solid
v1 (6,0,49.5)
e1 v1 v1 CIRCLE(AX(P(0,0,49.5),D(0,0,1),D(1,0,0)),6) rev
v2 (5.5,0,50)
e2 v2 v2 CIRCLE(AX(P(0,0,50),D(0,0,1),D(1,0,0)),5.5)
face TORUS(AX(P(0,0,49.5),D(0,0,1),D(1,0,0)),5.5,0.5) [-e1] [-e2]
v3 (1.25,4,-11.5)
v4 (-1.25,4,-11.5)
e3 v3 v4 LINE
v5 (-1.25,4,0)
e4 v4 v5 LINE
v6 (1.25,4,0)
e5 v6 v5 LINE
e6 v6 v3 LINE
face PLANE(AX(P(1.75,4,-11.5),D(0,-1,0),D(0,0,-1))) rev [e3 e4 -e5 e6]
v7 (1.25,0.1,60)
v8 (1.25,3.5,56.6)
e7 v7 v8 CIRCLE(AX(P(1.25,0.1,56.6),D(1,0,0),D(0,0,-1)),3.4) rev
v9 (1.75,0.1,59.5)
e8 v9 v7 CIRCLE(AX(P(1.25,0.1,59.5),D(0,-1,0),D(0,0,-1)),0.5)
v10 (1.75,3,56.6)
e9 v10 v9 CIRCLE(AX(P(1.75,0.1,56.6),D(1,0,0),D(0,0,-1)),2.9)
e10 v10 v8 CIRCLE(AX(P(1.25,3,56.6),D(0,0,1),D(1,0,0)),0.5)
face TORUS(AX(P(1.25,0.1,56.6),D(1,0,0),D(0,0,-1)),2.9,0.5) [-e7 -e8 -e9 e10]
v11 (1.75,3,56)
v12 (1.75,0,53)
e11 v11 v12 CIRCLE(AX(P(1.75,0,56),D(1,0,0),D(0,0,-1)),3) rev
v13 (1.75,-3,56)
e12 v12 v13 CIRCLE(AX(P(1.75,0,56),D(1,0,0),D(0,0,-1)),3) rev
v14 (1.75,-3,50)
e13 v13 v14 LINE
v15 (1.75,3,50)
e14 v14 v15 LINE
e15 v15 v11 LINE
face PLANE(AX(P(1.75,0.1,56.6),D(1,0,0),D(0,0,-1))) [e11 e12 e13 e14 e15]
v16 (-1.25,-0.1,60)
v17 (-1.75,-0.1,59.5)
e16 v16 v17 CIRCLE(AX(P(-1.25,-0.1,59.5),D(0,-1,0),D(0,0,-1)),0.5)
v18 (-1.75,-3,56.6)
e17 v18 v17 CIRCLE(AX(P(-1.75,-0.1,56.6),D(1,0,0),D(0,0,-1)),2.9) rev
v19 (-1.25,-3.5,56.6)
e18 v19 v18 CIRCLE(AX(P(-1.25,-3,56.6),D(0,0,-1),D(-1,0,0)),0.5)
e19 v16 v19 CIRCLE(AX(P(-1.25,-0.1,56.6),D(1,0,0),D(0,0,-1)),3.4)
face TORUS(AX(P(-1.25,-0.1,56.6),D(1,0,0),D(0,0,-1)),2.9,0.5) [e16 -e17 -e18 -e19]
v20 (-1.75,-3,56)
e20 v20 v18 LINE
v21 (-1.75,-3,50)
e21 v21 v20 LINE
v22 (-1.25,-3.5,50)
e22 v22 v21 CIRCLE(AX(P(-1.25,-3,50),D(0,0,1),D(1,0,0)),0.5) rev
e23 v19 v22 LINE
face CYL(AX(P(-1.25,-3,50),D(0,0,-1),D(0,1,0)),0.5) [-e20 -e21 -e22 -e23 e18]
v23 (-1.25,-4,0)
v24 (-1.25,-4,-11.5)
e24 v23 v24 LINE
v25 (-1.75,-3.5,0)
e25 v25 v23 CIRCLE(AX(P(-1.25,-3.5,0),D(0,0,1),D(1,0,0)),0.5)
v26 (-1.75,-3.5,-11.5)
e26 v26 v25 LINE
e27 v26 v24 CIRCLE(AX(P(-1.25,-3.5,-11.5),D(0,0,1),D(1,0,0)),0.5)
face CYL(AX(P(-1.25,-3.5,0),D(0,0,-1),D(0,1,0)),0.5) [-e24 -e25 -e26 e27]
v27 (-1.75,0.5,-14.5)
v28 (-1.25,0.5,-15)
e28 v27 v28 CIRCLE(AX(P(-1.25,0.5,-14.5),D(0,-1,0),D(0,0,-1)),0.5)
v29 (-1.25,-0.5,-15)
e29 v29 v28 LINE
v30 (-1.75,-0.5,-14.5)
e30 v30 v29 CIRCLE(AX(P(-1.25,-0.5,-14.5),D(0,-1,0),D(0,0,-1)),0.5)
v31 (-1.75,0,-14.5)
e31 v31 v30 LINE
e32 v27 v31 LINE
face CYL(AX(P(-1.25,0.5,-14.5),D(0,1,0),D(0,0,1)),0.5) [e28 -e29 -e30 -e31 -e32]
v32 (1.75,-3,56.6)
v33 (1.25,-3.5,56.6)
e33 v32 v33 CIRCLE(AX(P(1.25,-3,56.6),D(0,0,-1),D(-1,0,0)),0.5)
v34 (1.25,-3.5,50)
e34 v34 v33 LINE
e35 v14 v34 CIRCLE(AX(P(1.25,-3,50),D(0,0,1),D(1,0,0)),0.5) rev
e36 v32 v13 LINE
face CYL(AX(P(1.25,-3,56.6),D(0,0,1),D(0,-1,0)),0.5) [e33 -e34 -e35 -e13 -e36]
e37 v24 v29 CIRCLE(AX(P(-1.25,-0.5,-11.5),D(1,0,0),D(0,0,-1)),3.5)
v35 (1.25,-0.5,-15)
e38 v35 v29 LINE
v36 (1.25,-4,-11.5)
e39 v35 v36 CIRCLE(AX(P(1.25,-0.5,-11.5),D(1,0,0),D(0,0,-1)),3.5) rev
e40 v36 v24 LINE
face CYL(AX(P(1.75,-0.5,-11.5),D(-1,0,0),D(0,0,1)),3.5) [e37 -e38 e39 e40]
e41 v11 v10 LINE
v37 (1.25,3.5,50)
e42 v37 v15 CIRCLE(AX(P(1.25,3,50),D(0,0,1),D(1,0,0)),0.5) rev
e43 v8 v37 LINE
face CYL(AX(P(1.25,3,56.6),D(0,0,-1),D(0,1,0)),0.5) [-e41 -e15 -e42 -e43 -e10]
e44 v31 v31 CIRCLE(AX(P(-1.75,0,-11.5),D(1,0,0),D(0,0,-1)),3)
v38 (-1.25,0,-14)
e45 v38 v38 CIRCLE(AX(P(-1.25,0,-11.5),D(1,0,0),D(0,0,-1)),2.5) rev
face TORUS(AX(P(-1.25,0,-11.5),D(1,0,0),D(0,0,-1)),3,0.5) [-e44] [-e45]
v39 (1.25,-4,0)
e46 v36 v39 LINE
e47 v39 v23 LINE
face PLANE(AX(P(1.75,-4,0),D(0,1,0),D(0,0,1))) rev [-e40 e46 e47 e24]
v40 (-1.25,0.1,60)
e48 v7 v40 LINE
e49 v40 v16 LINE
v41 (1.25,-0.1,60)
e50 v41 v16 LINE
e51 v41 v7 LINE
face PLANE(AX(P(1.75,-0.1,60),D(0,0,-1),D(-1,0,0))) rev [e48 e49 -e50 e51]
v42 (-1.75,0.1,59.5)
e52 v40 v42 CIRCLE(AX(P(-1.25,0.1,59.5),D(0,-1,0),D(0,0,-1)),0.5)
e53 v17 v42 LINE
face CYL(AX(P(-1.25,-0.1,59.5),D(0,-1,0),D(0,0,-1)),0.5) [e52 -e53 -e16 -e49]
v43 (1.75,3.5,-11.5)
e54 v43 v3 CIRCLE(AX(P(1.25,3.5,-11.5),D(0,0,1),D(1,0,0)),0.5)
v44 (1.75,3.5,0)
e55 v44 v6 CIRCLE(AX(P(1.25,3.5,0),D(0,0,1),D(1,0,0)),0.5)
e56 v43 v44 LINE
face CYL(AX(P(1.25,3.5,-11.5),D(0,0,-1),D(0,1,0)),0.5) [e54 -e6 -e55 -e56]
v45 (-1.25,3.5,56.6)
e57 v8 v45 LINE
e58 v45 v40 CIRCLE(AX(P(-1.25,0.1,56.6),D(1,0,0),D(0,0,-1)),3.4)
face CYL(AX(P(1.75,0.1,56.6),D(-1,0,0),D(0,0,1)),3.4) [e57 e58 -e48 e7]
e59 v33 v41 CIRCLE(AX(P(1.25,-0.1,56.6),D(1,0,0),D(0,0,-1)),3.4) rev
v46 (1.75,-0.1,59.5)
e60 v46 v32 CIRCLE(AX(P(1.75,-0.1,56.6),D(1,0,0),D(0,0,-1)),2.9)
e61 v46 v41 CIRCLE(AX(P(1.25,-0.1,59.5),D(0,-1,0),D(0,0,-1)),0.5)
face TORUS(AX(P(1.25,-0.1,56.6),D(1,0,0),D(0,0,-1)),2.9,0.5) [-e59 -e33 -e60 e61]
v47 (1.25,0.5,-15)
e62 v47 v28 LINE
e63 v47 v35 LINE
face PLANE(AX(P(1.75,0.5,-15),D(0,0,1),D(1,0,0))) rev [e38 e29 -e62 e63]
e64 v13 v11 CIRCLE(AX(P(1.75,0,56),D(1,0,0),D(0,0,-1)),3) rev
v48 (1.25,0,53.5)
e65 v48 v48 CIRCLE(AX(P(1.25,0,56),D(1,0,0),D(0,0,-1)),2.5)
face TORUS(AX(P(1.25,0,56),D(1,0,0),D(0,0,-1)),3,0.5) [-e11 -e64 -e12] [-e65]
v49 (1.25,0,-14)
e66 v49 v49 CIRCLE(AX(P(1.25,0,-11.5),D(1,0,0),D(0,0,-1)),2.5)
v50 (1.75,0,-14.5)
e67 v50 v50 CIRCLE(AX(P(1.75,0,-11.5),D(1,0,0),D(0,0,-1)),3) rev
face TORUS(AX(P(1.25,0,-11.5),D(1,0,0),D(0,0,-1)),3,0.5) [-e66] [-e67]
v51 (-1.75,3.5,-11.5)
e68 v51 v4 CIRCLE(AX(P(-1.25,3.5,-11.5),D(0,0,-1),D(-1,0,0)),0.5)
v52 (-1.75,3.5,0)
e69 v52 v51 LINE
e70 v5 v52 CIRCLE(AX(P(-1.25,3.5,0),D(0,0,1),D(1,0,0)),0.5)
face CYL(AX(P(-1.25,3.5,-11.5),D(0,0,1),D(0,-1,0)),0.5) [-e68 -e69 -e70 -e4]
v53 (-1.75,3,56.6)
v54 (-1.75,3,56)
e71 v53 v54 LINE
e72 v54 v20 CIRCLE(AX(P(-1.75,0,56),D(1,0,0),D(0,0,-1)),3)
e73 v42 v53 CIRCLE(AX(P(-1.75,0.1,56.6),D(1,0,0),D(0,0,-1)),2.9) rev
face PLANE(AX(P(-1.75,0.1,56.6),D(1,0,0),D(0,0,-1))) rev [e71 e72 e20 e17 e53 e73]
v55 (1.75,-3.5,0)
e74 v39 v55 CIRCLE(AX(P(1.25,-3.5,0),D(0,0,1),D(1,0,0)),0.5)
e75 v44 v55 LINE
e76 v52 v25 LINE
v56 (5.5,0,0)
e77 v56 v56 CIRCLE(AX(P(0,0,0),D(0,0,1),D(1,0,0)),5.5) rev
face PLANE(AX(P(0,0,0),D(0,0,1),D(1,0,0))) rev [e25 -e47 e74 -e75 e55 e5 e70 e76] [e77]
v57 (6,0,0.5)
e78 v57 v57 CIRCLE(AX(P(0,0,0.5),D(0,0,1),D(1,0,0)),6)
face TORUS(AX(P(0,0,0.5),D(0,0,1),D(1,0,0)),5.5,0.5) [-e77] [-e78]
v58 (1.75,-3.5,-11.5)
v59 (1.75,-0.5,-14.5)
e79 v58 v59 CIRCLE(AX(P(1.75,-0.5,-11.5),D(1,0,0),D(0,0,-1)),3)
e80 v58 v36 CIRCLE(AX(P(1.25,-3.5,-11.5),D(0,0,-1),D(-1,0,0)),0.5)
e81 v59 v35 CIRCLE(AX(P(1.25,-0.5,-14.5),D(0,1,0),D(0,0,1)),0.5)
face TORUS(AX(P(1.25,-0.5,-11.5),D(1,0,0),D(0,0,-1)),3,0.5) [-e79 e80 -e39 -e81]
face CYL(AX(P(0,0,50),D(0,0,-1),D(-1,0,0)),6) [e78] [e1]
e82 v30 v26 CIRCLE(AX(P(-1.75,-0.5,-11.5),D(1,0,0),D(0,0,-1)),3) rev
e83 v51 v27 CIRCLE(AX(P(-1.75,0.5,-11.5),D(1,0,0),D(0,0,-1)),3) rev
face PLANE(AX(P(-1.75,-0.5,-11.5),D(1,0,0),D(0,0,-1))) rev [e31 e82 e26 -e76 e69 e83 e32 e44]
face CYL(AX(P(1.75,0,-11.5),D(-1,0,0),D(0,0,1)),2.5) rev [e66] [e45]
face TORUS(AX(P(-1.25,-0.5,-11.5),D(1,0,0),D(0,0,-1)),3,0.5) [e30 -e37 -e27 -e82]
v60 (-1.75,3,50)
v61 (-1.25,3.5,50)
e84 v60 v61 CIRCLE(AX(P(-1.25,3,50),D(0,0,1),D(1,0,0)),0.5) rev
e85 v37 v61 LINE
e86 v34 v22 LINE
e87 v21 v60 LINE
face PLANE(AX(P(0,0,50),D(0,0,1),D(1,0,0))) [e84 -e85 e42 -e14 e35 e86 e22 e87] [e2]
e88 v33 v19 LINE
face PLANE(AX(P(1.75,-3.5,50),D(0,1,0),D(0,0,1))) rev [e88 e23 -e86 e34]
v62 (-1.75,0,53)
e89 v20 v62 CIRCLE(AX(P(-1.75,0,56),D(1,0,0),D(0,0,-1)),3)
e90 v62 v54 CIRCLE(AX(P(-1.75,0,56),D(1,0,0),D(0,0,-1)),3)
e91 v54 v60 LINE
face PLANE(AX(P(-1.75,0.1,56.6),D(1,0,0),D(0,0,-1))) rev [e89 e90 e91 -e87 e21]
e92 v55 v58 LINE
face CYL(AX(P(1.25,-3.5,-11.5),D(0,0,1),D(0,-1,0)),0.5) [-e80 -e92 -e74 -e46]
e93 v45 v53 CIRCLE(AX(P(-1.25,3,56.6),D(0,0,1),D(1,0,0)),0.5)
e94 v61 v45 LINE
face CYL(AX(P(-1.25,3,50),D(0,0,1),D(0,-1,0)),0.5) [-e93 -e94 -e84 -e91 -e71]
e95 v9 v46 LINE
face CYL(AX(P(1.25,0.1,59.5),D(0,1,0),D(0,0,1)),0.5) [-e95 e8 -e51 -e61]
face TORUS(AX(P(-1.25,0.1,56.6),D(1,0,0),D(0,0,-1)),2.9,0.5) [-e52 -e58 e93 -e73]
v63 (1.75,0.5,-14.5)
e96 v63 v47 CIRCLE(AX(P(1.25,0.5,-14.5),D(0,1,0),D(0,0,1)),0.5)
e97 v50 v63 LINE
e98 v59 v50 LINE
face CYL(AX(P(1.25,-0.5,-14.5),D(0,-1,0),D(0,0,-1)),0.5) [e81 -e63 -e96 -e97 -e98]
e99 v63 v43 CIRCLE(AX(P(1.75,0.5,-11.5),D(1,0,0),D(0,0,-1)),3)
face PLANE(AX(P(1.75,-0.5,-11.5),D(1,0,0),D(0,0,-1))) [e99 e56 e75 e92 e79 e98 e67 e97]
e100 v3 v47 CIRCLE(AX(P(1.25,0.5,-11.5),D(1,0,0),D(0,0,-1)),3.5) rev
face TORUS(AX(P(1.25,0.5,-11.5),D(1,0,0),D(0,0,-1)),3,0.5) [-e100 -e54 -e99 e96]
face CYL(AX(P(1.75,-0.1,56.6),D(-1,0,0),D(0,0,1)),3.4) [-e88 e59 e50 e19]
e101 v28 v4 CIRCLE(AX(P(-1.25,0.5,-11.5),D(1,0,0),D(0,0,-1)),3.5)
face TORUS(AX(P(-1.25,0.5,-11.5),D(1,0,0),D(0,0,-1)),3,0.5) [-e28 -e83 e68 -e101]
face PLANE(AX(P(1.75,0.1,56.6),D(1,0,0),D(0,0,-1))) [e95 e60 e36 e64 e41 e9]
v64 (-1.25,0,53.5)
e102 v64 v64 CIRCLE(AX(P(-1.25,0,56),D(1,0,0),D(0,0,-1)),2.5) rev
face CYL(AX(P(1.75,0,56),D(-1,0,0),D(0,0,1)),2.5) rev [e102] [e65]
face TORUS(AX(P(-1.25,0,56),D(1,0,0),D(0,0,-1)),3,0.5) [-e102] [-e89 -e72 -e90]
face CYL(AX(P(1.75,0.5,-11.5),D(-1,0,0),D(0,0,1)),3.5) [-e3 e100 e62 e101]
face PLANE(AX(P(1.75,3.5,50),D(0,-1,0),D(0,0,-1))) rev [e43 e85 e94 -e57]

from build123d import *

# Parameters (mm, degrees)
SKETCH_1_R      = 6
EXTRUDE_1_DEPTH = 50
SKETCH_2_R      = 2.5
EXTRUDE_2_DEPTH = 1.75
FILLET_1_R      = 0.5
FILLET_3_R      = 0.5


with BuildPart() as part:
    # 草圖1 → 填料-伸長1 (new body)
    with BuildSketch(Plane.XY):
        Circle(SKETCH_1_R)
    extrude(amount=EXTRUDE_1_DEPTH)

    # 草圖2 → 填料-伸長2 (add, symmetric)
    # profile 1 of 2: a face of its own
    with BuildSketch(Plane(origin=(0, 0, 0), x_dir=(0, 0, -1), z_dir=(1, 0, 0))):
        with BuildLine():
            Line((11.5, 4), (0, 4))
            Line((0, 4), (0, -4))
            Line((0, -4), (11.5, -4))
            ThreePointArc((11.5, -4), (13.974873734, -2.974873734), (15, -0.5))
            Line((15, -0.5), (15, 0.5))
            ThreePointArc((15, 0.5), (13.974873734, 2.974873734), (11.5, 4))
        make_face()
        with Locations((11.5, 0)):
            Circle(SKETCH_2_R, mode=Mode.SUBTRACT)
    # profile 2 of 2: a face of its own
    with BuildSketch(Plane(origin=(0, 0, 0), x_dir=(0, 0, -1), z_dir=(1, 0, 0))):
        with BuildLine():
            Line((-50, -3.5), (-56.6, -3.5))
            ThreePointArc((-56.6, -3.5), (-59.004163056, -2.504163056), (-60, -0.1))
            Line((-60, -0.1), (-60, 0.1))
            ThreePointArc((-60, 0.1), (-59.004163056, 2.504163056), (-56.6, 3.5))
            Line((-56.6, 3.5), (-50, 3.5))
            Line((-50, 3.5), (-50, -3.5))
        make_face()
        with Locations((-56, 0)):
            Circle(SKETCH_2_R, mode=Mode.SUBTRACT)
    extrude(amount=EXTRUDE_2_DEPTH, both=True)

    # 圓角1
    fillet_1_edges = [part.edges().sort_by_distance(p)[0] for p in [
        (-1.75, -3.5, 53.3),
        (-1.75, -2.504163056, 59.004163056),
        (-1.75, 0, 60),
        (-1.75, 2.504163056, 59.004163056),
        (-1.75, 3.5, 53.3),
        (1.75, 4, -5.75),
        (1.75, 2.974873734, -13.974873734),
        (1.75, 0, -15),
        (1.75, -2.974873734, -13.974873734),
        (-1.75, -4, -5.75),
        (-1.75, -2.974873734, -13.974873734),
        (-1.75, 0, -15),
        (-1.75, 2.974873734, -13.974873734),
        (1.75, -3.5, 53.3),
        (1.75, -2.504163056, 59.004163056),
        (1.75, 0, 60),
        (1.75, 2.504163056, 59.004163056),
        (1.75, 0, -9),
        (1.75, -4, -5.75),
        (-1.75, 4, -5.75),
        (1.75, 0, 58.5),
        (1.75, 3.5, 53.3),
        (-1.75, 0, 58.5),
        (-1.75, 0, -9),
    ]]
    fillet(fillet_1_edges, radius=FILLET_1_R - 0.0001)  # a hair under: the kernel refuses the full size

    # 圓角3
    fillet_3_edges = [part.edges().sort_by_distance(p)[0] for p in [
        (-6, 0, 0),
        (-6, 0, 50),
    ]]
    fillet(fillet_3_edges, radius=FILLET_3_R)


solid = part.part
